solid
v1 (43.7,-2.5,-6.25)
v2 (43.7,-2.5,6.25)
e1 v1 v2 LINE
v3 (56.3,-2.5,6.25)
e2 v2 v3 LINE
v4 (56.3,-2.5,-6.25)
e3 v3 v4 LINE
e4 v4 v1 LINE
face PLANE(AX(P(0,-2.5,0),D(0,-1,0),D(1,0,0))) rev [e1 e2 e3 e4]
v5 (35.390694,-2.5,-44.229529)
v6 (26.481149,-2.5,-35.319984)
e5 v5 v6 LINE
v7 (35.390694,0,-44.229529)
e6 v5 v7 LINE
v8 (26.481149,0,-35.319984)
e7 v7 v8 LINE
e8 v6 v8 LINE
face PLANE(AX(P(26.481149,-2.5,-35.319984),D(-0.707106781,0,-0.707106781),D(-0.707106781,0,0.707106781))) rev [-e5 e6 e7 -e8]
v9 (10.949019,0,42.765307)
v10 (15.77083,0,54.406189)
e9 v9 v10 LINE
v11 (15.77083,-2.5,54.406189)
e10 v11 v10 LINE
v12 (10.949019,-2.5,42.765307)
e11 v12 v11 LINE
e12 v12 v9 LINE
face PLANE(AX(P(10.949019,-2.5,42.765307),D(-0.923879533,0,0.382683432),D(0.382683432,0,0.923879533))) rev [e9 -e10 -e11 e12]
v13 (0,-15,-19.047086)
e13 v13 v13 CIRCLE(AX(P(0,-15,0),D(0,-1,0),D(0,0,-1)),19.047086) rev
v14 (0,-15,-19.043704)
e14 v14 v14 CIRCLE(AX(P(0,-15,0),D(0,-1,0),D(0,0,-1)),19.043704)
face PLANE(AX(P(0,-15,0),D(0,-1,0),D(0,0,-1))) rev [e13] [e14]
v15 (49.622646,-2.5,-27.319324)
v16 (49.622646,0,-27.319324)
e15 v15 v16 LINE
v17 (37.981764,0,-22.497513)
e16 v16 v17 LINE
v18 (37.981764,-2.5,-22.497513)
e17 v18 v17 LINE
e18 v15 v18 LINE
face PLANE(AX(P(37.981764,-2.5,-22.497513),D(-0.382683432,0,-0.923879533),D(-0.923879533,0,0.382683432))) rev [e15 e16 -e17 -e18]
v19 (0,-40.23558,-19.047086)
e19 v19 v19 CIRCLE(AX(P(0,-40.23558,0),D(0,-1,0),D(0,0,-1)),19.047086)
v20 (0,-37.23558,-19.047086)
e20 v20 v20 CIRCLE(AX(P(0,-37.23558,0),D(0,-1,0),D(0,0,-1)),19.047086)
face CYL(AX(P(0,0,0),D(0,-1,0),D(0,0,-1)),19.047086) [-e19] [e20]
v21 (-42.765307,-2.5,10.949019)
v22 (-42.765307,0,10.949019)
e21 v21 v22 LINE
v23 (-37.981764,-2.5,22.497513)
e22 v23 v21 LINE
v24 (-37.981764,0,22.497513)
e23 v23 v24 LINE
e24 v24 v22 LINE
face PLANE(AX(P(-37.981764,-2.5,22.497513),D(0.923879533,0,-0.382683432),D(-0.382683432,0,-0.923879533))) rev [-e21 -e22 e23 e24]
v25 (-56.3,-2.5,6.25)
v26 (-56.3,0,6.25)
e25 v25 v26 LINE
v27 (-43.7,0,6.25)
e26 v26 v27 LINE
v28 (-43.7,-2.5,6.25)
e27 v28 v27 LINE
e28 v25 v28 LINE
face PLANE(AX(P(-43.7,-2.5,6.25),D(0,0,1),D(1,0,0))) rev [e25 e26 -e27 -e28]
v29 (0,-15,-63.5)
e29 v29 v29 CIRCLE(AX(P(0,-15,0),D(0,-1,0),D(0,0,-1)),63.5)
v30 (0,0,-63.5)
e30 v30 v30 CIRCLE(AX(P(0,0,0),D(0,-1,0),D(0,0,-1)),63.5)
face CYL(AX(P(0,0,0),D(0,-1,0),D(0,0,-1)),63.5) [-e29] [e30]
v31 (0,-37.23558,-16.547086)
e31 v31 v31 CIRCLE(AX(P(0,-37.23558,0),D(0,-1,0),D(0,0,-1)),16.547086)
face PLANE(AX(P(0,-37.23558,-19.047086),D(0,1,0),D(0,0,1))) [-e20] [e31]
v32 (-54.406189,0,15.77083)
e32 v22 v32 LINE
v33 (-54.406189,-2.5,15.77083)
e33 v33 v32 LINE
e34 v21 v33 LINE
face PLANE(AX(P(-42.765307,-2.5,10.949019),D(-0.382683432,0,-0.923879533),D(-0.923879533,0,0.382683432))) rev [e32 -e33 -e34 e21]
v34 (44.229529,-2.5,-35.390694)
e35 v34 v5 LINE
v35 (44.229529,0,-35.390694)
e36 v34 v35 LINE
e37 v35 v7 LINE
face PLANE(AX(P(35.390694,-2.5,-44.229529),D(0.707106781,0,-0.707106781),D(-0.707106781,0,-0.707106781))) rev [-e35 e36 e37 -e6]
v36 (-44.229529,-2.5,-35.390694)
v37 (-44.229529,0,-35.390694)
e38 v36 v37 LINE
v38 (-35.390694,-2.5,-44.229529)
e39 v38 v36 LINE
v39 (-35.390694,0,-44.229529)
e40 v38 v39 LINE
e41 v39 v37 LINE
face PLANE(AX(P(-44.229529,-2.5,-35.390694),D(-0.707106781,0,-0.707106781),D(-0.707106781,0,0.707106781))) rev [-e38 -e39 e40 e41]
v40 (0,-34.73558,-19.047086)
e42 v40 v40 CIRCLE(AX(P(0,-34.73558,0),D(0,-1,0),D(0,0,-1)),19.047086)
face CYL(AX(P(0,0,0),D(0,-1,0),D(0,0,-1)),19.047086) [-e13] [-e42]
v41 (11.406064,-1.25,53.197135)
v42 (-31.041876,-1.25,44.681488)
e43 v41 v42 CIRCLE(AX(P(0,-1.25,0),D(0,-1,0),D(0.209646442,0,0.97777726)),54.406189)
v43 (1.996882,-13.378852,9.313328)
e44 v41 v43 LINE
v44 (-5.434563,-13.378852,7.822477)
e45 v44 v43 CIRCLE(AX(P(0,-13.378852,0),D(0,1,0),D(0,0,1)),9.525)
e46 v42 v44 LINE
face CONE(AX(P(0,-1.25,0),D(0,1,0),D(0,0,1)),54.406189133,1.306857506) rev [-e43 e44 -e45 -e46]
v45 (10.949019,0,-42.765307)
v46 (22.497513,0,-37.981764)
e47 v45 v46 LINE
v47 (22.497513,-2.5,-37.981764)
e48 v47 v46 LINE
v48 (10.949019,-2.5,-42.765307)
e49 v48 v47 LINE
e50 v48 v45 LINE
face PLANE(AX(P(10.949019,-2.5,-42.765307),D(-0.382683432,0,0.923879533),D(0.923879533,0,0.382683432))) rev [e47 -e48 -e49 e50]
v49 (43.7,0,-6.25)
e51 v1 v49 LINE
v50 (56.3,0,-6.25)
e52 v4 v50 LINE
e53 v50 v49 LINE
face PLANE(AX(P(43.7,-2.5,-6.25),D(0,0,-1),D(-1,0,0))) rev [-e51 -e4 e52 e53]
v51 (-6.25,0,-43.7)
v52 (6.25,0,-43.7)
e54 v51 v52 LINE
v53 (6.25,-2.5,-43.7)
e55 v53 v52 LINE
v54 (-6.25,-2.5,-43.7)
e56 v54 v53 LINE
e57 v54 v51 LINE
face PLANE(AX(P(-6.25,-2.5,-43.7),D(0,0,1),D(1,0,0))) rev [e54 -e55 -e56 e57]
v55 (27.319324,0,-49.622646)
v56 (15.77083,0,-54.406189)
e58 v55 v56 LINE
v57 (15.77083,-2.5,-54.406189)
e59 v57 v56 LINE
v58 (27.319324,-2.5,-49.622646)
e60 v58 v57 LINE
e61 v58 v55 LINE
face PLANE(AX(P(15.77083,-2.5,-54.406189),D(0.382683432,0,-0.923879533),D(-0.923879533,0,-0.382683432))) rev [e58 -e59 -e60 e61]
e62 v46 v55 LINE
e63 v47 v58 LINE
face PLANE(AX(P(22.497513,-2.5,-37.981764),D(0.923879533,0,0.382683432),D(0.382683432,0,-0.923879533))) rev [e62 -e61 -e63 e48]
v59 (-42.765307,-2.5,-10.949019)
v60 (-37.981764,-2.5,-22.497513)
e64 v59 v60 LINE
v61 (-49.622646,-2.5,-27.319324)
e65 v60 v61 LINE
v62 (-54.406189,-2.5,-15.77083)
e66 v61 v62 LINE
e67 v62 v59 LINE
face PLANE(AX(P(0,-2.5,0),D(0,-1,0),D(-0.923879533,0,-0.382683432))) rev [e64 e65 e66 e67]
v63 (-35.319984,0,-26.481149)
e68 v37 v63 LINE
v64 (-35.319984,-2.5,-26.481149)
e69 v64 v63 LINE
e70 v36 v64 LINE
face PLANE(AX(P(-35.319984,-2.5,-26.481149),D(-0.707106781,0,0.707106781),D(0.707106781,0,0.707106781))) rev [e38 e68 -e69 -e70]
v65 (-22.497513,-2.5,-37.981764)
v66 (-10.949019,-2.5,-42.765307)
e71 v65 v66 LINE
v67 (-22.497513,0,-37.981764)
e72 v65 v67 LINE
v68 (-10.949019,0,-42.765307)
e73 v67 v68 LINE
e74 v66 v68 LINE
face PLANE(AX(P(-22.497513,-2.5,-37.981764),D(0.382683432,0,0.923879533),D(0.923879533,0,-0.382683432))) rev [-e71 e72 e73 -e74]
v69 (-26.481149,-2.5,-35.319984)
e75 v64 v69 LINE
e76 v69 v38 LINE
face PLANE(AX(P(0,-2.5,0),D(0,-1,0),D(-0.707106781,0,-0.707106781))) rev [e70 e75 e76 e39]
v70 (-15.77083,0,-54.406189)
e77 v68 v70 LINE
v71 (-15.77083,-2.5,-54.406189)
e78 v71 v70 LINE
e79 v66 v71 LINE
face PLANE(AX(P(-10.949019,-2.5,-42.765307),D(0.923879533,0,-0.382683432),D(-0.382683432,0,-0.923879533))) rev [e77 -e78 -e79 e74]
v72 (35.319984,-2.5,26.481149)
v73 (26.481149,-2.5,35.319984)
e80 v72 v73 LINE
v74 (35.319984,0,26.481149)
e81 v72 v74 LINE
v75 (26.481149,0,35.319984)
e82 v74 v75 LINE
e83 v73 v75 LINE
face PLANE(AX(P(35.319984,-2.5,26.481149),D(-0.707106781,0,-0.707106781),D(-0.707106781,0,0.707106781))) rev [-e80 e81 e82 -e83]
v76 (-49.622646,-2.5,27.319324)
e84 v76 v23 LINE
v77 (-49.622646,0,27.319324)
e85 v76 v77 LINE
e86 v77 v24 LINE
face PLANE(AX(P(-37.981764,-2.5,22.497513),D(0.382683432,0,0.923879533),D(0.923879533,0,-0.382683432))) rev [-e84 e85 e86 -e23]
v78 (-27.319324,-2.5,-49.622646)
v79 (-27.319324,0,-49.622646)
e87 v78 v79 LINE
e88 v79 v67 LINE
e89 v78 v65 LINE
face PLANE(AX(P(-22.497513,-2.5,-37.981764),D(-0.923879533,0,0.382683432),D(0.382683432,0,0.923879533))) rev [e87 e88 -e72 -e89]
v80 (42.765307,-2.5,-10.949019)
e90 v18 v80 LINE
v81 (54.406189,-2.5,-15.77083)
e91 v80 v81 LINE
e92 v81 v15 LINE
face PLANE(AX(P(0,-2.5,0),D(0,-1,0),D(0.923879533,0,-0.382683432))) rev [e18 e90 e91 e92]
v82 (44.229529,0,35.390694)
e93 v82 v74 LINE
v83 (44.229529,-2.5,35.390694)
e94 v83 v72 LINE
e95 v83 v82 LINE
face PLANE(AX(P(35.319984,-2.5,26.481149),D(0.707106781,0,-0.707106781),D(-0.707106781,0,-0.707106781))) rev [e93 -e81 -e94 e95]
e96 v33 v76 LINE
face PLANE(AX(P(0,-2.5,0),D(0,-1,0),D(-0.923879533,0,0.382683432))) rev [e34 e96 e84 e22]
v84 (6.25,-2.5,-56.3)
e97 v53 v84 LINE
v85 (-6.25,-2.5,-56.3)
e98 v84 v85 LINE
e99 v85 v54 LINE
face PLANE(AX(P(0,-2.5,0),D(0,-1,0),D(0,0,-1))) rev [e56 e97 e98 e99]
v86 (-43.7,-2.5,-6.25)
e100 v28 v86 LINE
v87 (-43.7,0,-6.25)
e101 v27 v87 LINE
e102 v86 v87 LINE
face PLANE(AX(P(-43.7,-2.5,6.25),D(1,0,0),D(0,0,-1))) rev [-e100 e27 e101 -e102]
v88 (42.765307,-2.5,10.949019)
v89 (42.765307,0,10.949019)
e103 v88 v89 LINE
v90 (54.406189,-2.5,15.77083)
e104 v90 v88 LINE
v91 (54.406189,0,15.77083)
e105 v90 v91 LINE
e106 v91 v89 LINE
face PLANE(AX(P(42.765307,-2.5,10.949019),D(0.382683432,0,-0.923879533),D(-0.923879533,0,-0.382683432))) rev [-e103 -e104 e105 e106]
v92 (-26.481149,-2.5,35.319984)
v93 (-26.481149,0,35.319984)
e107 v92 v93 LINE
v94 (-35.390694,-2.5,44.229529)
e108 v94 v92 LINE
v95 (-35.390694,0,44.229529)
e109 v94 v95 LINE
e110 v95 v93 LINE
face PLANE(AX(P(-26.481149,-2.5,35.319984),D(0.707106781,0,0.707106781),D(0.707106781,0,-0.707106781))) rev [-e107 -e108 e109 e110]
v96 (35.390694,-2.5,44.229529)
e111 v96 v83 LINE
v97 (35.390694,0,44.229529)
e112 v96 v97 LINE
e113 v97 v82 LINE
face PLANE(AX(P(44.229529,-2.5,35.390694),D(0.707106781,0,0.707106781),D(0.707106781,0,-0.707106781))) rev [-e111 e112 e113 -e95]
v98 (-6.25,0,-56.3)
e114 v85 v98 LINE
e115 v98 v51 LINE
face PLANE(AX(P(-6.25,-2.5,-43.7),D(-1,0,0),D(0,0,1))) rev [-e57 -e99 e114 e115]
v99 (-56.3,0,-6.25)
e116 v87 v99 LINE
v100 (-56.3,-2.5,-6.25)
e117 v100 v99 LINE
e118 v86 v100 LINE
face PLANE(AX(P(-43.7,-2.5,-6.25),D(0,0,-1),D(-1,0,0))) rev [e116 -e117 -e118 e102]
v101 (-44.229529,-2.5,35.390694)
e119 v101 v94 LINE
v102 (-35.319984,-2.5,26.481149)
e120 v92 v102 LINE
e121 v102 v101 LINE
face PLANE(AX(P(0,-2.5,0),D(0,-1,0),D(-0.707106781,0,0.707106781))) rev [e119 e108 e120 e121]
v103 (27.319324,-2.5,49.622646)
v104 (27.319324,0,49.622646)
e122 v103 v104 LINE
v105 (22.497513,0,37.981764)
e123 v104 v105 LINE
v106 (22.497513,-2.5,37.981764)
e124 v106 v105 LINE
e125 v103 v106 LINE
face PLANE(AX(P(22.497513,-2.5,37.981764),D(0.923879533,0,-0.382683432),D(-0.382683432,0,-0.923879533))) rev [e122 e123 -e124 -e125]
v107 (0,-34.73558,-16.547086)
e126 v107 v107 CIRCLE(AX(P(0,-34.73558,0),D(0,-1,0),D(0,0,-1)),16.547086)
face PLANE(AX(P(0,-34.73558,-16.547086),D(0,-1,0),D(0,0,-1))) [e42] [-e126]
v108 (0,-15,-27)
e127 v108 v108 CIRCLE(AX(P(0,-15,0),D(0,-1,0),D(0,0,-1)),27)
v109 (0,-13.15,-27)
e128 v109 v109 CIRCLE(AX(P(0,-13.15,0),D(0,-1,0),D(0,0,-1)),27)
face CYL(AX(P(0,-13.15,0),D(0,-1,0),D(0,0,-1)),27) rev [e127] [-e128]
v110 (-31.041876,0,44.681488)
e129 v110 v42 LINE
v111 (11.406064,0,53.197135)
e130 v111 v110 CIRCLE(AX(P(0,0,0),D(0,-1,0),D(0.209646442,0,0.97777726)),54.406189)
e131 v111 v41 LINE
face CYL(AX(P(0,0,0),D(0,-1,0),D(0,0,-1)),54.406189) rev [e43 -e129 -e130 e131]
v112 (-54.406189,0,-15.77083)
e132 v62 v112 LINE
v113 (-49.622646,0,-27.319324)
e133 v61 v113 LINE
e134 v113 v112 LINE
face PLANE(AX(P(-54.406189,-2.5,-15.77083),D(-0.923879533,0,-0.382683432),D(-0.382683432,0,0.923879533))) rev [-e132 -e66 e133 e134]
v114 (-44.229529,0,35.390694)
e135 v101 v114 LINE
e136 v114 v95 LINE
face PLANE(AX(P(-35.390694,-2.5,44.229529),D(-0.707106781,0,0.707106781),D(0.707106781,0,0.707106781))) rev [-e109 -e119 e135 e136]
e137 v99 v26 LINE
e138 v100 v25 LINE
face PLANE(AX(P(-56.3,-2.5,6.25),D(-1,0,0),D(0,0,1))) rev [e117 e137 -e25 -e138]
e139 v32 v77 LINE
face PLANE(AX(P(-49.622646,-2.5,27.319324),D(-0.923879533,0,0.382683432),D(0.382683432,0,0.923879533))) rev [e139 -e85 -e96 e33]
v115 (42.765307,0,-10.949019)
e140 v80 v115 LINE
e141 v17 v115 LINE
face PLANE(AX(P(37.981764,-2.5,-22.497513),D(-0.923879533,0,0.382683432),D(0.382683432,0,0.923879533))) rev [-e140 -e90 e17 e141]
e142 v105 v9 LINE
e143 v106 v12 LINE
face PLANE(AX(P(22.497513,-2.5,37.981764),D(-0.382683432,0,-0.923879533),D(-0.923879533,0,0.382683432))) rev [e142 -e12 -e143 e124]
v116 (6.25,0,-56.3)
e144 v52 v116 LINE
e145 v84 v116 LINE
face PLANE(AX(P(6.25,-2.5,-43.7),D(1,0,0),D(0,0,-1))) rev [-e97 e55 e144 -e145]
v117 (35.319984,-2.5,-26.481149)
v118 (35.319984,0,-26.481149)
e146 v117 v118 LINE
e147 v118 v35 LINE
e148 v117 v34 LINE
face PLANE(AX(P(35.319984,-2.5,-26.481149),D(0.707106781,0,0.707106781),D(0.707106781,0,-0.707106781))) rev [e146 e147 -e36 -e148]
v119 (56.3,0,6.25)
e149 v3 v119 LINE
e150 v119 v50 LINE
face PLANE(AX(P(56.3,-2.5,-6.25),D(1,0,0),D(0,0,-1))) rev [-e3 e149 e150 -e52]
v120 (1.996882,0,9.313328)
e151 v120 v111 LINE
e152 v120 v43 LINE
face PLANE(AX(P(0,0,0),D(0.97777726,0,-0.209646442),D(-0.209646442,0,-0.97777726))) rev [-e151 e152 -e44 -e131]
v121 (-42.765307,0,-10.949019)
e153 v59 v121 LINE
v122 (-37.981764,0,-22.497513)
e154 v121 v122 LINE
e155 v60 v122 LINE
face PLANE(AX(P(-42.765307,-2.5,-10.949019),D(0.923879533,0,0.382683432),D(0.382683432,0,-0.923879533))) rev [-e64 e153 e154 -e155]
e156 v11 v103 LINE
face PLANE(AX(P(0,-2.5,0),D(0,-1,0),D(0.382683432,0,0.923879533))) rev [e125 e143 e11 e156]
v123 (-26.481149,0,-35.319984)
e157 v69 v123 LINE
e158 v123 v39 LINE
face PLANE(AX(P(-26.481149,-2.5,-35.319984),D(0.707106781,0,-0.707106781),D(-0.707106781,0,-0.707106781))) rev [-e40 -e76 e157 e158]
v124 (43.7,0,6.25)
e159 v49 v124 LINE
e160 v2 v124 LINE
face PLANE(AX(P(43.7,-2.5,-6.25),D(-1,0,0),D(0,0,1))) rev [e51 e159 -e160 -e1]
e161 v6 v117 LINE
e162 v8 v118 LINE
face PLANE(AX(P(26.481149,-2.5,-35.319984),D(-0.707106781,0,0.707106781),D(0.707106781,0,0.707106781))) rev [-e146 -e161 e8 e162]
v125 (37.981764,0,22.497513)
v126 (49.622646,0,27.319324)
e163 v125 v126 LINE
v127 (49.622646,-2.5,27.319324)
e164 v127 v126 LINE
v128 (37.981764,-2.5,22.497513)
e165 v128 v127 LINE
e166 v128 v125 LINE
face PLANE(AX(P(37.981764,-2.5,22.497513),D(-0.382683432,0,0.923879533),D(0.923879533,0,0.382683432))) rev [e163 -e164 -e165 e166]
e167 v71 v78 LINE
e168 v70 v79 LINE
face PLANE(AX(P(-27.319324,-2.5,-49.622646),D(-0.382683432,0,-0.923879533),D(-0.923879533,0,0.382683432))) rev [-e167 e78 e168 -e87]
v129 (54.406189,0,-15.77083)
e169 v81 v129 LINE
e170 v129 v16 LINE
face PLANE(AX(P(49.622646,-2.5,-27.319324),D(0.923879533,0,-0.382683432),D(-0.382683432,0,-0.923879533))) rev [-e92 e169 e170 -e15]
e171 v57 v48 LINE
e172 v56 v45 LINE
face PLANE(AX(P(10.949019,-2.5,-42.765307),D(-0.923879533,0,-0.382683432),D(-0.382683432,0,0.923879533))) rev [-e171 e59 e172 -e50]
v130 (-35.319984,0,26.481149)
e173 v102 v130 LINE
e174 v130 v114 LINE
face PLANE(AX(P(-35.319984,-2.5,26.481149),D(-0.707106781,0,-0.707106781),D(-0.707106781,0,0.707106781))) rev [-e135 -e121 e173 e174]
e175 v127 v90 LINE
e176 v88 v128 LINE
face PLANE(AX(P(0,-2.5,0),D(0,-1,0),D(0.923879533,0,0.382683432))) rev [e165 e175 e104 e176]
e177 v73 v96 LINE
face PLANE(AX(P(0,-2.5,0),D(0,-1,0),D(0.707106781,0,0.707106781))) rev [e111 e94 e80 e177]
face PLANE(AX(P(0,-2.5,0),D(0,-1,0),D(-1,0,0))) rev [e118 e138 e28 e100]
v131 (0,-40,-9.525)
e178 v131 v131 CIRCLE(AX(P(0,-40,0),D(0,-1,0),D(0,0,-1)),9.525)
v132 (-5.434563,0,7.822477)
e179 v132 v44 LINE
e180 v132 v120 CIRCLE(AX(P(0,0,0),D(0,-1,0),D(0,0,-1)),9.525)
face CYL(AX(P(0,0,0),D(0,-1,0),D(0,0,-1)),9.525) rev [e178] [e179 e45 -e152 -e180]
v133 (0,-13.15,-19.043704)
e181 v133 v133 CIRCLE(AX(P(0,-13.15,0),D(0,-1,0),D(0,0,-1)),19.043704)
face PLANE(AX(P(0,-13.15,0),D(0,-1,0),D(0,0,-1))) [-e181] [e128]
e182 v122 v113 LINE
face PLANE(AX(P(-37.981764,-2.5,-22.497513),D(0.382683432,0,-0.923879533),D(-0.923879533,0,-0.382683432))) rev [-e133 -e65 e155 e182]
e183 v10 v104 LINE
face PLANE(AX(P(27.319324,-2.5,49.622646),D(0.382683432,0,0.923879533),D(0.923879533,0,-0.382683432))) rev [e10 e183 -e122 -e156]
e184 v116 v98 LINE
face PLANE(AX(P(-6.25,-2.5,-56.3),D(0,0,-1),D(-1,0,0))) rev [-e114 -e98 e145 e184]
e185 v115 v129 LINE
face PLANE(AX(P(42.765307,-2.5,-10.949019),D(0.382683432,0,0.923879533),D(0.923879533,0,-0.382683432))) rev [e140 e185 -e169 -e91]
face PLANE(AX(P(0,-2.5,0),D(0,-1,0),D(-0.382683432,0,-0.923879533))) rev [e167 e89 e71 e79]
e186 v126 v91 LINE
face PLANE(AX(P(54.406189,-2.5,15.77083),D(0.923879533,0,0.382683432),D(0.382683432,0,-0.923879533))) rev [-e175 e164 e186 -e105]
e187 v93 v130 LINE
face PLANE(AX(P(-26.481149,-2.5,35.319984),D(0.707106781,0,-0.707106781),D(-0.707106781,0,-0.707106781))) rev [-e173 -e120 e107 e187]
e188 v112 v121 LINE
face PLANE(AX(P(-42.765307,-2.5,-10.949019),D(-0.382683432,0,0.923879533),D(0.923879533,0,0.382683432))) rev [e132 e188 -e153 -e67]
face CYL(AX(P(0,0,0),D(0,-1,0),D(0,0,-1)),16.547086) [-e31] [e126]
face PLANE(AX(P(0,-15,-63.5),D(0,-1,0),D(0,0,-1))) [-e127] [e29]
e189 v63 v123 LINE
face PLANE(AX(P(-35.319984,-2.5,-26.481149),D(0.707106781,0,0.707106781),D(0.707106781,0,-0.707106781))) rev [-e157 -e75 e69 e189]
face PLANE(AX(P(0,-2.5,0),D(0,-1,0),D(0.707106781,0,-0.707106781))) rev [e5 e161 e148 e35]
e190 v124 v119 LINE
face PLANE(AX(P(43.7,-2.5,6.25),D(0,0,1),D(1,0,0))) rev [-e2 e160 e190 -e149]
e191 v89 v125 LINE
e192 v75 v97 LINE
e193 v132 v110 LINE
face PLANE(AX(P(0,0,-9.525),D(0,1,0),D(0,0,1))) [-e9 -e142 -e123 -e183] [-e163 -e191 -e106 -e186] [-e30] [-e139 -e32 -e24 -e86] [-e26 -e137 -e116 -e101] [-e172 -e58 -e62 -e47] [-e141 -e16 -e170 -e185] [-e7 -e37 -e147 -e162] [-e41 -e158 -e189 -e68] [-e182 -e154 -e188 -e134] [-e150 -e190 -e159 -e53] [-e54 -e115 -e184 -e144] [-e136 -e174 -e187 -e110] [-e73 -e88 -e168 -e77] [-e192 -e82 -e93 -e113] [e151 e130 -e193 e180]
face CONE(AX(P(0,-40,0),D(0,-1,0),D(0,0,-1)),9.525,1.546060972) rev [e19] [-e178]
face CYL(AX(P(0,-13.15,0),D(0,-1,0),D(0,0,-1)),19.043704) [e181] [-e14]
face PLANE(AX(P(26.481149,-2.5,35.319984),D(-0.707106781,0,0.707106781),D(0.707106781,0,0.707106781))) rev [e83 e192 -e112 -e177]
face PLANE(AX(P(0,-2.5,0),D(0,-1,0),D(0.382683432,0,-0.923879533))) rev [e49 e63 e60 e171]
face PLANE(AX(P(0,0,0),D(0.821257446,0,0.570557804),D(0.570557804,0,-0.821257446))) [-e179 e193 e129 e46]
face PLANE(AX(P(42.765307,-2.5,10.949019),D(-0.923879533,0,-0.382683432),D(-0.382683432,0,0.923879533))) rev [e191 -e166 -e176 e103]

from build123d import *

# Parameters (mm, degrees)
SKETCH3_W          = 12.5
SKETCH3_H          = 12.6
CUT_EXTRUDE1_DEPTH = 2.5
CIRPATTERN1_COUNT  = 16
CUT_SWEEP3_ANGLE   = 46.890766
SKETCH8_R          = 27
SKETCH8_R_2        = 19.043703719
CUT_EXTRUDE2_DEPTH = 1.85


# Read off the part's stored shape, not the designer's step: Cut-Sweep3
with BuildPart() as part:
    # Sketch1 → Revolve1 (revolve)
    with BuildSketch(Plane(origin=(0, 0, 0), x_dir=(0, 0, -1), z_dir=(1, 0, 0))):
        Polygon((9.525, 0), (63.5, 0), (63.5, -15), (19.047086271, -15), (19.047086271, -34.735580232), (16.547086271, -34.735580232), (16.547086271, -37.235580232), (19.047086271, -37.235580232), (19.047086271, -40.235580232), (9.525, -40), align=None)
    revolve(axis=Axis((0, 0, 0), (0, 1, 0)))

    # Sketch3 → Cut-Extrude1 (cut)
    with BuildSketch(Plane(origin=(0, 0, 0), x_dir=(1, 0, 0), z_dir=(0, 1, 0))):
        with Locations((0, 50)):
            Rectangle(SKETCH3_W, SKETCH3_H)
    cut_extrude1 = extrude(amount=-CUT_EXTRUDE1_DEPTH, mode=Mode.SUBTRACT)

    # CirPattern1: Cut-Extrude1 ×16 about axis, 2 skipped
    cirpattern1_axis = Axis((0, 0, 0), (0, -1, 0))
    add([cut_extrude1.rotate(cirpattern1_axis, i * 360 / CIRPATTERN1_COUNT) for i in range(1, CIRPATTERN1_COUNT) if i not in (8, 9)], mode=Mode.SUBTRACT)

    # Cut-Sweep3 outline → Cut-Sweep3 (revolve, cut)
    with BuildSketch(Plane(origin=(0, 0, 0), x_dir=(-0.5705578043075055, 0, 0.8212574455941318), z_dir=(-0.8212574455941318, 0, -0.5705578043075055))):
        Polygon((54.406189133, -1.25), (54.406189133, 0), (9.525, 0), (9.525, -13.378851836), align=None)
    revolve(axis=Axis((0, 0, 0), (0, 1, 0)), revolution_arc=CUT_SWEEP3_ANGLE, mode=Mode.SUBTRACT)

    # Sketch8 → Cut-Extrude2 (cut)
    with BuildSketch(Plane.XZ.offset(15)):
        with Locations(Location((0, 0, 0), (0, 0, 270))):
            Circle(SKETCH8_R)
        with Locations(Location((0, 0, 0), (0, 0, 270))):
            Circle(SKETCH8_R_2, mode=Mode.SUBTRACT)
    extrude(amount=-CUT_EXTRUDE2_DEPTH, mode=Mode.SUBTRACT)


solid = part.part
